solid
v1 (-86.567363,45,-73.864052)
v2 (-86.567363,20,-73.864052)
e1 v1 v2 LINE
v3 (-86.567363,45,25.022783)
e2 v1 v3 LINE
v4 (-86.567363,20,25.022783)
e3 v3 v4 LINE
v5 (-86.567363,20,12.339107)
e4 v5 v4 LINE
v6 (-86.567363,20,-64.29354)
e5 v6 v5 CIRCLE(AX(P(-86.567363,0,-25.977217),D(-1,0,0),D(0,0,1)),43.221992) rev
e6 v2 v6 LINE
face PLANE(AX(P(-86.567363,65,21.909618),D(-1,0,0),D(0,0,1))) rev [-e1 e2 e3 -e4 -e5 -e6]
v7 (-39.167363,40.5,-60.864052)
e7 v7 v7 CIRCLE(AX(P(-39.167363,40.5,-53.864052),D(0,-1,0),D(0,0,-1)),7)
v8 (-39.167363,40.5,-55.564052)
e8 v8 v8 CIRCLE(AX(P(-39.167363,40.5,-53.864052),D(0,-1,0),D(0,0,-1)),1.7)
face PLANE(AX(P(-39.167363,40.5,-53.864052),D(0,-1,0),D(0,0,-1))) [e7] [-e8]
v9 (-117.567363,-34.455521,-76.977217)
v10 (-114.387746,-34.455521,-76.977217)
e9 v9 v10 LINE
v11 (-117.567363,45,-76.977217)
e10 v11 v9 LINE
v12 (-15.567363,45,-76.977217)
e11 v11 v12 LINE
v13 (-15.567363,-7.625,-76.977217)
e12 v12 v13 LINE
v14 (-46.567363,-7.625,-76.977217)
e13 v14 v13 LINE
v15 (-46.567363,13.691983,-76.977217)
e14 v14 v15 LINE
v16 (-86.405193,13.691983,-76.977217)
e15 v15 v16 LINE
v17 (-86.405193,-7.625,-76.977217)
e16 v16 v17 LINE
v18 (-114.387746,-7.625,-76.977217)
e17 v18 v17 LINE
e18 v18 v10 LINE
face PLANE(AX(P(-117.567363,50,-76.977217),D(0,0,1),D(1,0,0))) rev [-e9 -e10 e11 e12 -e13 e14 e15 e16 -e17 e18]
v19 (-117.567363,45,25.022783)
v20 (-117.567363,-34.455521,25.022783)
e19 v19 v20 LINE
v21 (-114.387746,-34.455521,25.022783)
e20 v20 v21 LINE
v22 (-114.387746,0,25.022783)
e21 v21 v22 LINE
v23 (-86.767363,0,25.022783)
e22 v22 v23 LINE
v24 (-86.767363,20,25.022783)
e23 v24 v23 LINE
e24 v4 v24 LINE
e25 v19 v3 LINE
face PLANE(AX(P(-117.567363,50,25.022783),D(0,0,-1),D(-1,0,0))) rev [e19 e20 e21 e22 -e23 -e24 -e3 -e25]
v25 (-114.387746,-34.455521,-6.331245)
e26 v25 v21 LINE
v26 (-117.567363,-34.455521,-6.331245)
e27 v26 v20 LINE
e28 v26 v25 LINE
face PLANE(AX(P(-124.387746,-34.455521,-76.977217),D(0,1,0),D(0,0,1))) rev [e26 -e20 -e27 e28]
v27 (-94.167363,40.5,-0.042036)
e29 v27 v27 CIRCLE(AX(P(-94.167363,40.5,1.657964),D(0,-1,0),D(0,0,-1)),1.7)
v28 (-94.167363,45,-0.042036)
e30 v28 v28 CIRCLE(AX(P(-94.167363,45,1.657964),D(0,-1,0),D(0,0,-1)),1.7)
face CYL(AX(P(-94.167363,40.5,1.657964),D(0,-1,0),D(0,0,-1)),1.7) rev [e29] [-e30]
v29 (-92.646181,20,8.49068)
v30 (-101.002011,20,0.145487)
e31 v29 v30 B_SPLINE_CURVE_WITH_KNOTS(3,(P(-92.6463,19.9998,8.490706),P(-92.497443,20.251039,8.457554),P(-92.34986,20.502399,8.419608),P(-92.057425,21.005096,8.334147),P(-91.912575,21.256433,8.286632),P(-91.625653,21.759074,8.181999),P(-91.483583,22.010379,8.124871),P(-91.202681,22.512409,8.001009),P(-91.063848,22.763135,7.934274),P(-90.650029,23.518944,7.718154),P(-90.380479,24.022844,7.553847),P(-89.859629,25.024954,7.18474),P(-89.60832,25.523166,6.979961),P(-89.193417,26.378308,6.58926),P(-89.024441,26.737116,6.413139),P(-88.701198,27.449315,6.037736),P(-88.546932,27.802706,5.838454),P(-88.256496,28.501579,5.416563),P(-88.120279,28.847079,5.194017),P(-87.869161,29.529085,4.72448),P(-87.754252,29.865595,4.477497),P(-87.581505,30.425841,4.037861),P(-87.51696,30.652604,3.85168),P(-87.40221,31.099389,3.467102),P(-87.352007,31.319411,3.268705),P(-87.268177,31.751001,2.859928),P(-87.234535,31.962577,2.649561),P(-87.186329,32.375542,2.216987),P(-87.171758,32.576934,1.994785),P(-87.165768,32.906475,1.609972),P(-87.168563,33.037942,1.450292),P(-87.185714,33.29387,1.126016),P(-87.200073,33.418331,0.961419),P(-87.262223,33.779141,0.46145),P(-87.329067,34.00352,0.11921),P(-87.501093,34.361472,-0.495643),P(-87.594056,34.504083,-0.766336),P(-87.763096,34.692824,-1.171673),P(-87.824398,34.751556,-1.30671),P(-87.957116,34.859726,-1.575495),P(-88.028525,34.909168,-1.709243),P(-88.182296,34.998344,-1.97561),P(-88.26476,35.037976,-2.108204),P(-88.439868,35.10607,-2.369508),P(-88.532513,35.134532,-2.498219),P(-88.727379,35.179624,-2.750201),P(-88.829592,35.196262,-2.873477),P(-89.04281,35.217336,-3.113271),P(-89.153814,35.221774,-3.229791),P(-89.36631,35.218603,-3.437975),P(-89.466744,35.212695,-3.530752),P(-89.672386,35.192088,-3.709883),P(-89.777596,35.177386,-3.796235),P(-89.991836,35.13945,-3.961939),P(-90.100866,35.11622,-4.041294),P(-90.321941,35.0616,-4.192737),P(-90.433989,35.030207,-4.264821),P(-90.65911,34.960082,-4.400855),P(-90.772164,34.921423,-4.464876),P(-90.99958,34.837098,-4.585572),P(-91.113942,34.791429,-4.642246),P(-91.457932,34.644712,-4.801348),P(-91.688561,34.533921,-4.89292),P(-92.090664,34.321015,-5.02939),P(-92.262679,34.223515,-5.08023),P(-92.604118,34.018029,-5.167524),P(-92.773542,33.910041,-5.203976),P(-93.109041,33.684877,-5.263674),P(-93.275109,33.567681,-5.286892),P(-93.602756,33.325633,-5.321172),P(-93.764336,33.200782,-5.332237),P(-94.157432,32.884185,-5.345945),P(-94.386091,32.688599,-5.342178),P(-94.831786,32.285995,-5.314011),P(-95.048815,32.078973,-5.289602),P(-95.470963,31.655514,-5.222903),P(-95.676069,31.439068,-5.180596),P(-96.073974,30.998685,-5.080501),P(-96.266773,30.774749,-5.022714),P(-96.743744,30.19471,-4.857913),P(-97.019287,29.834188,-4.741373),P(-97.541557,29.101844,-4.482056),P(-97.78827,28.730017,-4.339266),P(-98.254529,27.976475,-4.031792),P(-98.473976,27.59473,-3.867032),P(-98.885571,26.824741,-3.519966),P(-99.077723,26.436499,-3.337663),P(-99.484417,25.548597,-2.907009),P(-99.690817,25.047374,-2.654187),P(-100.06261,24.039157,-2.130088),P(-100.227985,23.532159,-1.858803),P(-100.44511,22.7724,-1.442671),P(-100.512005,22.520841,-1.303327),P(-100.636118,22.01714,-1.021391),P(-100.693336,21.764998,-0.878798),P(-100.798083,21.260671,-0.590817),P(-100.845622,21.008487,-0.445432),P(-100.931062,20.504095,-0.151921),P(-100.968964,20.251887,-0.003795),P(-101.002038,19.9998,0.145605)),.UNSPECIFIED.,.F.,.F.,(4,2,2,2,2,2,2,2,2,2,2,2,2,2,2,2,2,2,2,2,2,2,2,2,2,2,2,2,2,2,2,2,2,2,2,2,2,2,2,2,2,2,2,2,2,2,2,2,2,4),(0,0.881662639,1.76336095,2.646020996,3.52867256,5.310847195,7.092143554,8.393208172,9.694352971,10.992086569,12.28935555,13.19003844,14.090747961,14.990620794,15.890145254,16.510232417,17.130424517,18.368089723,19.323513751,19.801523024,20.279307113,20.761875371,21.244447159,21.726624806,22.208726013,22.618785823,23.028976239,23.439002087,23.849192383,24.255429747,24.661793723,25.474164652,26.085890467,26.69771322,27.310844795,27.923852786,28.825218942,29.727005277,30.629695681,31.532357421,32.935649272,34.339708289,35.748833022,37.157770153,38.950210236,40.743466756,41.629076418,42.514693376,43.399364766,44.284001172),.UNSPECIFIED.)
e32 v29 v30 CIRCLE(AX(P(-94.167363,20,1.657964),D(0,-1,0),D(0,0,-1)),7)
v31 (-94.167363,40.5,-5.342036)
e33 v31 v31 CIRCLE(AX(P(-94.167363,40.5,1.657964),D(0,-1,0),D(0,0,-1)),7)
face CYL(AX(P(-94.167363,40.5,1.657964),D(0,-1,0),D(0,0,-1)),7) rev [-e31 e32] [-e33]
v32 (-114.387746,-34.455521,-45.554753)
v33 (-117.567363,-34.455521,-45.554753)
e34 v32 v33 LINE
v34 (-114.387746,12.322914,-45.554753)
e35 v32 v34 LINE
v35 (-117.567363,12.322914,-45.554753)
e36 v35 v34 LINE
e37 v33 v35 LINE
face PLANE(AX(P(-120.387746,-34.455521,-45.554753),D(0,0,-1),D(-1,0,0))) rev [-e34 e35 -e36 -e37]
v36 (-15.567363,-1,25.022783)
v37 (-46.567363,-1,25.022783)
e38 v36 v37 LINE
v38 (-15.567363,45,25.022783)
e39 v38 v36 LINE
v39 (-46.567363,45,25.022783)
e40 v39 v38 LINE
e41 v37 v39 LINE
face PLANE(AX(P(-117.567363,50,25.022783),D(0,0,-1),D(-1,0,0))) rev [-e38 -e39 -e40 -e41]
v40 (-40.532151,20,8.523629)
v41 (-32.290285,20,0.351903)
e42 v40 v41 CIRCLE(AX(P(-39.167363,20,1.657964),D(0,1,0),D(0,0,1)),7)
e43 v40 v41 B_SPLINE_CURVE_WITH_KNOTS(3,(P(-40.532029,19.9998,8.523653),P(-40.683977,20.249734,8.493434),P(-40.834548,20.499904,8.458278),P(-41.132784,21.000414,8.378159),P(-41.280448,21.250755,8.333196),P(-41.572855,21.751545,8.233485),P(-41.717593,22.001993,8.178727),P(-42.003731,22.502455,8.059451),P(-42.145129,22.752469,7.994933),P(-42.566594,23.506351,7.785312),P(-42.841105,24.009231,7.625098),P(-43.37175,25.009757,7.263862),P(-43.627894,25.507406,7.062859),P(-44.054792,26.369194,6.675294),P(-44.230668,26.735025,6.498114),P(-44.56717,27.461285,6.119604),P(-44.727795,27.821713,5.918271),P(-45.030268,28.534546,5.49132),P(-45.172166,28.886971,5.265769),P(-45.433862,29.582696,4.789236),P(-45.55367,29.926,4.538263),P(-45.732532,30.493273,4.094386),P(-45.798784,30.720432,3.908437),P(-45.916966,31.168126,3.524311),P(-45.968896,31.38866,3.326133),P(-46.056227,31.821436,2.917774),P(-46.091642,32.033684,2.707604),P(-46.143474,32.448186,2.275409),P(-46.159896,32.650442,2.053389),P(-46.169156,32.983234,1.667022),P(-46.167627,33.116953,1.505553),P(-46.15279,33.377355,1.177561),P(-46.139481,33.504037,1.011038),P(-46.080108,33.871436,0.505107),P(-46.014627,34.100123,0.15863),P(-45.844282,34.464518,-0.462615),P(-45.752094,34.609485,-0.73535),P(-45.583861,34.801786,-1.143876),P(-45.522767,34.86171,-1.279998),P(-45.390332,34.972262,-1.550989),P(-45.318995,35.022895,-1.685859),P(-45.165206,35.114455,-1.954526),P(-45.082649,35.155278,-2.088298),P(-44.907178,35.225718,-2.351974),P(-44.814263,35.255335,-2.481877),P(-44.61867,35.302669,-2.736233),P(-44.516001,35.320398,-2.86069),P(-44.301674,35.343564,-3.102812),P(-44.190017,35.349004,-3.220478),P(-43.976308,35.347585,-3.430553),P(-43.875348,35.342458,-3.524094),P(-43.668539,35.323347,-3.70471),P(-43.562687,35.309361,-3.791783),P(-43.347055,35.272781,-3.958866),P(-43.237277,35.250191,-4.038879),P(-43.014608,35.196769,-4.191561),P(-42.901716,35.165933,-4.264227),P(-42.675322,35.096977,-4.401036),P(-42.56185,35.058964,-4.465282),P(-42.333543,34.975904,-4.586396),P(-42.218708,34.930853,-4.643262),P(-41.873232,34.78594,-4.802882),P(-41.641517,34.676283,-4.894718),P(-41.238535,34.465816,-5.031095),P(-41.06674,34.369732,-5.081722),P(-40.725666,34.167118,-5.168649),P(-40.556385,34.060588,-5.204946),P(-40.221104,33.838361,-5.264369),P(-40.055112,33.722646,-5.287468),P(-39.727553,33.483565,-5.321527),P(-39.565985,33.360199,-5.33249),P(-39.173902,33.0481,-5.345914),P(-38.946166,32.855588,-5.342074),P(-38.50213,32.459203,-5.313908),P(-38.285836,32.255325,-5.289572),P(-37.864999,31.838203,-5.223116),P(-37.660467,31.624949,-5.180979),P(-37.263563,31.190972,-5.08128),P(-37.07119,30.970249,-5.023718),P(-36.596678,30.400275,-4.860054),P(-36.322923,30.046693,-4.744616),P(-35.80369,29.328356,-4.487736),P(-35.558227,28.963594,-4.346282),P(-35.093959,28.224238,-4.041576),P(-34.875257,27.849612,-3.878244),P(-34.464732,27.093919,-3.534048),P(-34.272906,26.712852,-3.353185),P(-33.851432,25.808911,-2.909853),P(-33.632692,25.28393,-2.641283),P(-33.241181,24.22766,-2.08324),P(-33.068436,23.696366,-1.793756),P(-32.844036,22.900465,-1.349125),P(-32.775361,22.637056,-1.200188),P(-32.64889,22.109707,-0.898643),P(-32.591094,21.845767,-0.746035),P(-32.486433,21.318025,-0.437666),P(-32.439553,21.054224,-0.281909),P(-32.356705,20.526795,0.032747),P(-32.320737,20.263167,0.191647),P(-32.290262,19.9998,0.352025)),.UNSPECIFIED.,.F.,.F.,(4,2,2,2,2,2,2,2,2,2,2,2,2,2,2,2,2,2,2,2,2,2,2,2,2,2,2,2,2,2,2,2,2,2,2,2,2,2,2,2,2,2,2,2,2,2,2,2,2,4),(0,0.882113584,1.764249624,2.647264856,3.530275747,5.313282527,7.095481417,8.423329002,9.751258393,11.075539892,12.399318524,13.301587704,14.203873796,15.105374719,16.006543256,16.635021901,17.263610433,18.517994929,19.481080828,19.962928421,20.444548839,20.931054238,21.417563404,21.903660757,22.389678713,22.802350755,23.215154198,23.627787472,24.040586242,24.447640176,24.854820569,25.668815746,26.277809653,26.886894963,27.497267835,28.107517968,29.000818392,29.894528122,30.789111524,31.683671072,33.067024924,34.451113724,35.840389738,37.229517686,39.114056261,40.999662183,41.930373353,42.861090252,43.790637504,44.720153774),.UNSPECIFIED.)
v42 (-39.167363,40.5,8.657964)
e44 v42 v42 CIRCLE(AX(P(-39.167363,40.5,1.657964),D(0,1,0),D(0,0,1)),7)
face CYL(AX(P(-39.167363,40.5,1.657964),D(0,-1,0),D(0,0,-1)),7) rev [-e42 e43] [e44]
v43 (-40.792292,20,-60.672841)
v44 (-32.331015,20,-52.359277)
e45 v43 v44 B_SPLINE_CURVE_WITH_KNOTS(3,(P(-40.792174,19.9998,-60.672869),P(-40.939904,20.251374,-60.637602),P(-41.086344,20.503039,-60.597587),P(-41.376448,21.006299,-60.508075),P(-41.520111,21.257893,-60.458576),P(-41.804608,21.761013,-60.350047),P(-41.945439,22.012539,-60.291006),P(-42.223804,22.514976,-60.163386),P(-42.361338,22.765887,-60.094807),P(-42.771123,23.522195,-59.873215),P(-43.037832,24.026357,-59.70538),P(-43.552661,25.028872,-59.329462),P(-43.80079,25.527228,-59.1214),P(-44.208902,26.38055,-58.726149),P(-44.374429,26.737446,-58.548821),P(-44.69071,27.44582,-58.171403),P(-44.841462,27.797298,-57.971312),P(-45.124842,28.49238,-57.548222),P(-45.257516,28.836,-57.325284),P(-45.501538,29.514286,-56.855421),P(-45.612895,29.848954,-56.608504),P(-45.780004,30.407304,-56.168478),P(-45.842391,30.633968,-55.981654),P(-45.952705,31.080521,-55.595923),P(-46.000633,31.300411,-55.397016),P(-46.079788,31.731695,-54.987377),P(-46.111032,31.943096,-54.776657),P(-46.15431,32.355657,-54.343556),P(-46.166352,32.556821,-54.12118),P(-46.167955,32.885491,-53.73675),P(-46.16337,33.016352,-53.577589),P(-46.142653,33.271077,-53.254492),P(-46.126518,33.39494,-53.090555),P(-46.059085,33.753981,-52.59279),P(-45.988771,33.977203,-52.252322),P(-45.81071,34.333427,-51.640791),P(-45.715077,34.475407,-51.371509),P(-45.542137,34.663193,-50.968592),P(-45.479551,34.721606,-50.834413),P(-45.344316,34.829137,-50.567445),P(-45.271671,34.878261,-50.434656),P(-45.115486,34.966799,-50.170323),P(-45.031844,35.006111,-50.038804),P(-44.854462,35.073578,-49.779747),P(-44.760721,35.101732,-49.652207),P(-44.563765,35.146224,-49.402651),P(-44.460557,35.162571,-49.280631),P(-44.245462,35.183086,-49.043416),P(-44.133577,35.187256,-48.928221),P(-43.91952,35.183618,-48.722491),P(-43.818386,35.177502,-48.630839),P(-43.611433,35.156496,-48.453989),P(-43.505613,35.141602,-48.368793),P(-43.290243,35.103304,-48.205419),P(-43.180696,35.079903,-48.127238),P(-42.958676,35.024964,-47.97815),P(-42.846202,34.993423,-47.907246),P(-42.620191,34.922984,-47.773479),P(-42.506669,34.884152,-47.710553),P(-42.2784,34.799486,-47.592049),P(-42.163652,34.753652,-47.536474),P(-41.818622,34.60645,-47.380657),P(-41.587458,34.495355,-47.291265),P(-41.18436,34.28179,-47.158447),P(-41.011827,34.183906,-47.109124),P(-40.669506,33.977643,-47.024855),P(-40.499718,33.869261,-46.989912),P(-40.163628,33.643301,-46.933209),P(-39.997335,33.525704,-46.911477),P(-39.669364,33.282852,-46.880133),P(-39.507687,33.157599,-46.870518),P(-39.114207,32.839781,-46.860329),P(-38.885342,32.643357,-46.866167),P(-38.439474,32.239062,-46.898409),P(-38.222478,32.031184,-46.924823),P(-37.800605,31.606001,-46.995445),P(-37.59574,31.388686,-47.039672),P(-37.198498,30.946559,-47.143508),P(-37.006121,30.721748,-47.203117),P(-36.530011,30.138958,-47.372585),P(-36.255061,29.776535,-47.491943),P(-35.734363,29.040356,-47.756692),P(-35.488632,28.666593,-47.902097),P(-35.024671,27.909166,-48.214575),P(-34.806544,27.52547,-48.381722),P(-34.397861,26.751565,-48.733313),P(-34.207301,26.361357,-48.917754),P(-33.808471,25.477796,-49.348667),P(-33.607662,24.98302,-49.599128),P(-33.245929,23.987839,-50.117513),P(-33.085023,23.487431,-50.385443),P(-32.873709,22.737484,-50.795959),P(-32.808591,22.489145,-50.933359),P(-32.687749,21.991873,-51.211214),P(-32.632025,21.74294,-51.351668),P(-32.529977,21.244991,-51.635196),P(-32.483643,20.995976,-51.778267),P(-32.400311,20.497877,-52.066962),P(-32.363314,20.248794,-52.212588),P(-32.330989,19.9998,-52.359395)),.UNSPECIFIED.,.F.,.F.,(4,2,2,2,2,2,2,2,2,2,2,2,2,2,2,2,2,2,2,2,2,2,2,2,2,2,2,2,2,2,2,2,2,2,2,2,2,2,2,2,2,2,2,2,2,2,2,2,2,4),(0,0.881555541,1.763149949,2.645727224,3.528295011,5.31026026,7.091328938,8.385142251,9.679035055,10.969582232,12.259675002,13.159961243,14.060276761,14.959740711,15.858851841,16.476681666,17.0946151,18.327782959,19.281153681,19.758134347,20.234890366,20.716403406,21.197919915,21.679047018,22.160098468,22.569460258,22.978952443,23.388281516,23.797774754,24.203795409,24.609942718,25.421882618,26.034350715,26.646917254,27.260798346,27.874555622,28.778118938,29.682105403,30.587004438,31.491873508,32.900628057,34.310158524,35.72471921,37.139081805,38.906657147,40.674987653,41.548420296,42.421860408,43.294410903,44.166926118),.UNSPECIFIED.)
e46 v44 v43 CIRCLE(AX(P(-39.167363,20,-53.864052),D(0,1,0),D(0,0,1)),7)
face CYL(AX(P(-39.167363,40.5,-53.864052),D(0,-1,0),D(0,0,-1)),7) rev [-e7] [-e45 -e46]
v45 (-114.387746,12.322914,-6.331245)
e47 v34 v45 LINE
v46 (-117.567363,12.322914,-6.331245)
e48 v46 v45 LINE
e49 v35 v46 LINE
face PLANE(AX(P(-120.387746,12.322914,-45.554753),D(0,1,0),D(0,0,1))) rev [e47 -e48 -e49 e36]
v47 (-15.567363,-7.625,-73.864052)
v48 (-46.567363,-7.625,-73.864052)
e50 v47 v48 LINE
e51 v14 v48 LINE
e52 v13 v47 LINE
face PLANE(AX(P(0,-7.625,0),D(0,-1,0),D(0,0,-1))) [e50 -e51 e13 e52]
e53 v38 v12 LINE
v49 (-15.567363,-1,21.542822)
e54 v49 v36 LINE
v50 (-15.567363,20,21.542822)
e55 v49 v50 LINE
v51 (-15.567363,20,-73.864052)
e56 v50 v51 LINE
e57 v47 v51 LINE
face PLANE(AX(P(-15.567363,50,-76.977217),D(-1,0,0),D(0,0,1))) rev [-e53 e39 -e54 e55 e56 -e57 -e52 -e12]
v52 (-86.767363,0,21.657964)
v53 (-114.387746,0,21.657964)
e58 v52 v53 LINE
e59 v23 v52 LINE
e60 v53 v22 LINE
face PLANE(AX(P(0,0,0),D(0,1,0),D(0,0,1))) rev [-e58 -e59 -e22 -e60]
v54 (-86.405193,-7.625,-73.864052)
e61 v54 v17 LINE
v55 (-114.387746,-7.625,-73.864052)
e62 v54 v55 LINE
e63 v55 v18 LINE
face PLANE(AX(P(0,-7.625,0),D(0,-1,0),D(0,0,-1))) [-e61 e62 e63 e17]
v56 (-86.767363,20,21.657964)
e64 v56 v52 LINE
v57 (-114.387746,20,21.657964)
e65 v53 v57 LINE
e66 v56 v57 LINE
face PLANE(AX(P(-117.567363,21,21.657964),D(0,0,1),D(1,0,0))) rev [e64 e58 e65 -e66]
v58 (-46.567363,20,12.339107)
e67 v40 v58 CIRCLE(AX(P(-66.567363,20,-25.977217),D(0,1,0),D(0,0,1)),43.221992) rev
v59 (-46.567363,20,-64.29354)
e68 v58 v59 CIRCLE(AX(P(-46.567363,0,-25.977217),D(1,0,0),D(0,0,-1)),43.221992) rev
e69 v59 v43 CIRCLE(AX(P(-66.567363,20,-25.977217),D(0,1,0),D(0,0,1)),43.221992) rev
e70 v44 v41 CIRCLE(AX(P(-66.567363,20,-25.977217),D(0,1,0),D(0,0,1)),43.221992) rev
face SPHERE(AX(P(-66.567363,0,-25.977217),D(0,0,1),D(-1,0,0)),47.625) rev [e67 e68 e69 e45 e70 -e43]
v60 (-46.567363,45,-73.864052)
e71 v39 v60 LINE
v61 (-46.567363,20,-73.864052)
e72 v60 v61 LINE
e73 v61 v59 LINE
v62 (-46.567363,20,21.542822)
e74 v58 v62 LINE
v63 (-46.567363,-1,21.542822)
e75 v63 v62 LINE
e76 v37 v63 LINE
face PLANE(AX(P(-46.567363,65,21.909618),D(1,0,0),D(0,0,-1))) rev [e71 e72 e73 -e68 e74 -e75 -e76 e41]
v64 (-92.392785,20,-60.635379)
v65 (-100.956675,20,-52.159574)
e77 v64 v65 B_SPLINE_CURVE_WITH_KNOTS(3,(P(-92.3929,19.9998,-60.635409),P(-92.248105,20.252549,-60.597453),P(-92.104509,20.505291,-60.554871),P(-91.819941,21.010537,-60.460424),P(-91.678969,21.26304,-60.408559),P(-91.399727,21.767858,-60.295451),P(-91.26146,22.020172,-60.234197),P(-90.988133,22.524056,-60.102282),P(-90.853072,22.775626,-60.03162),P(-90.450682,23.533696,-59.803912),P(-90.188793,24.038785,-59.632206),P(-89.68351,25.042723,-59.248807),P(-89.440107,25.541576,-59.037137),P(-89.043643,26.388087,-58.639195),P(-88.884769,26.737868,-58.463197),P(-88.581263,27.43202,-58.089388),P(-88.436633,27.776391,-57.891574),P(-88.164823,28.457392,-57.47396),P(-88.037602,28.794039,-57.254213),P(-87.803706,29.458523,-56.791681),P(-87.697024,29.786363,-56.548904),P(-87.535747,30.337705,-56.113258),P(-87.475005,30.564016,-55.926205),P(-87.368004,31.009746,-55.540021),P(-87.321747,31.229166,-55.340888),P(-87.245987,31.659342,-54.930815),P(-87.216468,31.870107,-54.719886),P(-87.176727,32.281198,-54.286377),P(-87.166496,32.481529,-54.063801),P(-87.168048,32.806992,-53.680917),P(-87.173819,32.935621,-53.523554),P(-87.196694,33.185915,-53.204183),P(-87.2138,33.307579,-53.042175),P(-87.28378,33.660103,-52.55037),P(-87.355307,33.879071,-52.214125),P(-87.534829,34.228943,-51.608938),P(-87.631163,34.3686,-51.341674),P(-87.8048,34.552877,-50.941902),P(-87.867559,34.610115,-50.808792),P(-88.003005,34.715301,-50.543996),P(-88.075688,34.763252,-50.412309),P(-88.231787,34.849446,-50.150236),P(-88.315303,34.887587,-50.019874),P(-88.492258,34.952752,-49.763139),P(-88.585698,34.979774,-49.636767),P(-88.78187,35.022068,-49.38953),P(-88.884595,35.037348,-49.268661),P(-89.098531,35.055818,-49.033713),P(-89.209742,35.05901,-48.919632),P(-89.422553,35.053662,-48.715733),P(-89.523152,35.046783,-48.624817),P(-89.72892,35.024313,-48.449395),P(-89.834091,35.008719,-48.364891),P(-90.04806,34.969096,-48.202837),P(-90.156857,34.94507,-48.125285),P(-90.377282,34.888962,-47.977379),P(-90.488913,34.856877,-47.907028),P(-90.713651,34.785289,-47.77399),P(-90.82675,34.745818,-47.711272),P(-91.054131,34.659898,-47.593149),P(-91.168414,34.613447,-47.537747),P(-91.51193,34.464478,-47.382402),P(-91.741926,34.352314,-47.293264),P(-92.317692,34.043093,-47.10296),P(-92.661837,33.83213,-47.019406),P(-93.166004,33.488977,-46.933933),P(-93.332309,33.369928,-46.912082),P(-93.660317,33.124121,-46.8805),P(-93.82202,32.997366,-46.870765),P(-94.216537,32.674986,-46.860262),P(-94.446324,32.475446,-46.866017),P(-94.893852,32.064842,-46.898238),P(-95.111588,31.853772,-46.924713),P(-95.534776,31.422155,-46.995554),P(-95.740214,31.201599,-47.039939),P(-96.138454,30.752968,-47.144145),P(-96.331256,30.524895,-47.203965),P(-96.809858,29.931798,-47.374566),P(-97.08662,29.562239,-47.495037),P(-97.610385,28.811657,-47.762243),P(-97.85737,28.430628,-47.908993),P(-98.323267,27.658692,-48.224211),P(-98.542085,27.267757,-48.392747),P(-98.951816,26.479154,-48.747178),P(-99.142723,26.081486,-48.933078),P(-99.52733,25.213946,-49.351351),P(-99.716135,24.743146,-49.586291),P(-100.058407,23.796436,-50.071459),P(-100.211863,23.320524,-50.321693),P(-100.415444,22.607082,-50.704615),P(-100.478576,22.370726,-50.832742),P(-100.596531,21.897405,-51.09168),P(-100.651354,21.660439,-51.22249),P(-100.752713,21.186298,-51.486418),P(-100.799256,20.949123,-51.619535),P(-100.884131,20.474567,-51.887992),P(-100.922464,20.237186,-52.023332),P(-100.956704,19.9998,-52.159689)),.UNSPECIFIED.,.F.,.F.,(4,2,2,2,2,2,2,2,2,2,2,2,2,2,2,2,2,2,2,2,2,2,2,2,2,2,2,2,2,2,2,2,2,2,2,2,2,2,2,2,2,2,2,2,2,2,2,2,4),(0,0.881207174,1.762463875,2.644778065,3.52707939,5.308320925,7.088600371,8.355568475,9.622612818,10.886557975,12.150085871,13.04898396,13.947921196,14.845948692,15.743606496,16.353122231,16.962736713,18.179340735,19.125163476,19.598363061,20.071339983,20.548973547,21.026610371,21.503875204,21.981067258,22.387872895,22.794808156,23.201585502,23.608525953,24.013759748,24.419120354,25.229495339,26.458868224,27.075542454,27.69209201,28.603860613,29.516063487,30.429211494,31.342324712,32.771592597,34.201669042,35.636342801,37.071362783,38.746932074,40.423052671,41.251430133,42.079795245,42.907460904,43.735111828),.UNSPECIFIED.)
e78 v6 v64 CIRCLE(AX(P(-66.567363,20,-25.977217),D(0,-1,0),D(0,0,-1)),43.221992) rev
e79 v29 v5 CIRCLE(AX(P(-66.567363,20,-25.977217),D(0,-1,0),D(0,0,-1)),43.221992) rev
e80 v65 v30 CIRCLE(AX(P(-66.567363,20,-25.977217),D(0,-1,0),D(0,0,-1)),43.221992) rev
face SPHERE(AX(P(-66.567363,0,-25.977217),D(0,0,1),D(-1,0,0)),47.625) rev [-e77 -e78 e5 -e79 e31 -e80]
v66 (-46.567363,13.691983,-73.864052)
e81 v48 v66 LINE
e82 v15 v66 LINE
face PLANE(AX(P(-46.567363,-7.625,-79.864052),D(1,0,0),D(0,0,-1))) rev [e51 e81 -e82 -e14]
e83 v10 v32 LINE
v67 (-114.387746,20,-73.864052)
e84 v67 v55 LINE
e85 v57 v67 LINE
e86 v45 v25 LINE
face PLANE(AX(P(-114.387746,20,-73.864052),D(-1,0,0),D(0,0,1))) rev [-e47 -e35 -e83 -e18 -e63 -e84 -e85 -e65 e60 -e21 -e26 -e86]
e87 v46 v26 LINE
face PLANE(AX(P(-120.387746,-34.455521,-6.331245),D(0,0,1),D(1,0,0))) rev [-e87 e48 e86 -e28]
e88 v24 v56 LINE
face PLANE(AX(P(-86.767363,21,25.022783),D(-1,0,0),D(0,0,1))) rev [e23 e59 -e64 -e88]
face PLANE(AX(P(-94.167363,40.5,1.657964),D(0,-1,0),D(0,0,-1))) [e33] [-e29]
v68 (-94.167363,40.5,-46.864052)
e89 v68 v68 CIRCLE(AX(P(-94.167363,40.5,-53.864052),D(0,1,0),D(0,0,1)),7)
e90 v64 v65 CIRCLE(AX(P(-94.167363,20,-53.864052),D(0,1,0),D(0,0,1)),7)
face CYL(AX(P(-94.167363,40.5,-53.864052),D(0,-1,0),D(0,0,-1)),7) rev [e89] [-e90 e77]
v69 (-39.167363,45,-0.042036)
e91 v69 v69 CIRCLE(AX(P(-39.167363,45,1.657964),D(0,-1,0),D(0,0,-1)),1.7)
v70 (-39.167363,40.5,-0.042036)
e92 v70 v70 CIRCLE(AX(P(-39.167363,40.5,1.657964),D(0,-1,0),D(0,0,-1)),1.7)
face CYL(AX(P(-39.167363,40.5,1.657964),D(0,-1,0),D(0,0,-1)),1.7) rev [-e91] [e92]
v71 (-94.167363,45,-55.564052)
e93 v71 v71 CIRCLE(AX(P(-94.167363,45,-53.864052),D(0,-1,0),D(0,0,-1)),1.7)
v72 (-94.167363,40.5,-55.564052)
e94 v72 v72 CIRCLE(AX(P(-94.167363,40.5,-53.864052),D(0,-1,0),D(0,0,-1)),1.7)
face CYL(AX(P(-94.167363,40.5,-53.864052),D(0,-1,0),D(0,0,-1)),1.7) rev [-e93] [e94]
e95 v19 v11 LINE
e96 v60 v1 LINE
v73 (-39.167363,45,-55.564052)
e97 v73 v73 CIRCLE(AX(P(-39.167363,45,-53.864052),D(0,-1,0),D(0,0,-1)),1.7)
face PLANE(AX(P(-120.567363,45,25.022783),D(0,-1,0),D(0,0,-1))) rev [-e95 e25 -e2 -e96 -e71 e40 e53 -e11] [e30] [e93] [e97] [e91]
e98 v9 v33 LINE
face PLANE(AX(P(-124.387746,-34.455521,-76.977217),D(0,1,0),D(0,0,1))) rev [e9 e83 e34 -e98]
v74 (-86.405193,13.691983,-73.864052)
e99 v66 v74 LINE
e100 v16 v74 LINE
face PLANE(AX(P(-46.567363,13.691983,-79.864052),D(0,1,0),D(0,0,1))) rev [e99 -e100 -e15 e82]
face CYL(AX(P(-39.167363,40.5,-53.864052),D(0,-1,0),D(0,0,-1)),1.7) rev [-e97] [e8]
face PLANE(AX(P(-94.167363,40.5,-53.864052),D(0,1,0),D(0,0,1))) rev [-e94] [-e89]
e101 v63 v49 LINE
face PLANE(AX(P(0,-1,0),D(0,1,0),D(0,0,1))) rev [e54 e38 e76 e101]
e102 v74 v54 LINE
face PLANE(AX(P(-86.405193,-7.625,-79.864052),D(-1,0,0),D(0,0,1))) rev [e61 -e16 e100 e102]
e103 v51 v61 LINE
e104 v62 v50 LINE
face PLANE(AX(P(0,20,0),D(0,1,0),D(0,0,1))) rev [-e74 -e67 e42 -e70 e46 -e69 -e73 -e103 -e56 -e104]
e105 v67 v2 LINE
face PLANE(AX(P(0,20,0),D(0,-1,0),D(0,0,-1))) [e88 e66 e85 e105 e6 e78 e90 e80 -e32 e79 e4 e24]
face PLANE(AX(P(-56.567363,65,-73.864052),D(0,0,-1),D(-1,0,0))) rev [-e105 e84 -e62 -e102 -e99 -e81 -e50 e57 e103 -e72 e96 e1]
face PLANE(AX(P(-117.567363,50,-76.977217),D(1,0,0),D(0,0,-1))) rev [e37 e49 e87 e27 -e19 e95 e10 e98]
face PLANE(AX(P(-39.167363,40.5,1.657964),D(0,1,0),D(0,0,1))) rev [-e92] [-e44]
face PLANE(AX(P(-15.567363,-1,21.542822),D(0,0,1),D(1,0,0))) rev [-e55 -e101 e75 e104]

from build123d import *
from build123d.topology import SkipClean

# Parameters (mm, degrees)
SKETCH1_W                   = 102
SKETCH1_H                   = 102
BOSS_EXTRUDE1_DEPTH         = 50
CUT_EXTRUDE_THIN1_OUTLINE_W = 40
CUT_EXTRUDE_THIN1_OUTLINE_H = 95.773670058
CUT_EXTRUDE_THIN1_DEPTH     = 50
SKETCH4_W                   = 40
SKETCH4_H                   = 6.202657501
CUT_EXTRUDE3_DEPTH          = 54
SKETCH5_W                   = 33.817621941
SKETCH5_H                   = 102.594578927
CUT_EXTRUDE4_DEPTH          = 20
SKETCH6_W                   = 27.820383201
SKETCH6_H                   = 98.886835029
CUT_EXTRUDE5_DEPTH          = 20
SKETCH7_W                   = 30.8
SKETCH7_H                   = 3.364819678
BOSS_EXTRUDE2_DEPTH         = 21
SKETCH9_W                   = 31
SKETCH9_H                   = 3.479961613
BOSS_EXTRUDE4_DEPTH         = 21
SKETCH11_W                  = 98.820383201
SKETCH11_H                  = 3.113164971
BOSS_EXTRUDE6_DEPTH         = 47.625
SKETCH14_W                  = 102
SKETCH14_H                  = 5
CUT_EXTRUDE7_DEPTH          = 105
SKETCH17_R                  = 7
CUT_EXTRUDE12_DEPTH         = 20.5
M3_CLEARANCE_HOLE1_D        = 3.4
SKETCH22_W                  = 3.179616799
SKETCH22_H                  = 102
BOSS_EXTRUDE7_DEPTH         = 47.6
SKETCH23_W                  = 98.820383201
SKETCH23_H                  = 3.113164971
CUT_EXTRUDE13_DEPTH         = 40
SKETCH24_W                  = 102
SKETCH24_H                  = 13.144479163
CUT_EXTRUDE14_DEPTH         = 10
SKETCH25_W                  = 39.837829701
SKETCH25_H                  = 21.316982849
CUT_EXTRUDE15_DEPTH         = 6
SKETCH26_W                  = 39.22350869
SKETCH26_H                  = 46.778434415
CUT_EXTRUDE16_DEPTH         = 6


# Read off the part's stored shape, not the designer's step: Cut-Extrude-Thin1
with BuildPart() as part:
    # Sketch1 → Boss-Extrude1 (new body)
    with BuildSketch(Plane(origin=(0, 0, 0), x_dir=(1, 0, 0), z_dir=(0, 1, 0))):
        with Locations((-66.567363259, 25.977216604)):
            Rectangle(SKETCH1_W, SKETCH1_H)
    extrude(amount=BOSS_EXTRUDE1_DEPTH)

    # Sketch2 → Cut-Revolve1 (revolve, cut)
    with SkipClean():  # the faces are left unmerged after this step: merging them gives an invalid solid
        with BuildSketch(Plane(origin=(0, 0, 0), x_dir=(1, 0, 0), z_dir=(0, 1, 0))):
            with BuildLine():
                ThreePointArc((-66.567363259, 73.602216604), (-114.192363259, 25.977216604), (-66.567363259, -21.647783396))
                Line((-66.567363259, -21.647783396), (-66.567363259, 73.602216604))
            make_face()
            with BuildLine():
                Line((-66.567363259, 73.602216604), (-66.567363259, -21.647783396))
                ThreePointArc((-66.567363259, -21.647783396), (-32.891402805, -7.69874385), (-18.942363259, 25.977216604))
                ThreePointArc((-18.942363259, 25.977216604), (-32.891402805, 59.653177058), (-66.567363259, 73.602216604))
            make_face()
        revolve(axis=Axis((-66.567363259, 0, 21.647783396), (0, 0, -1)), mode=Mode.SUBTRACT)
    add(part.part.scale(1), mode=Mode.REPLACE)  # the faces are merged on a copy

    # Cut-Extrude-Thin1 outline → Cut-Extrude-Thin1 (cut)
    with BuildSketch(Plane(origin=(0, 0, 0), x_dir=(1, 0, 0), z_dir=(0, 1, 0))):
        with Locations((-66.567363259, 25.977216604)):
            Rectangle(CUT_EXTRUDE_THIN1_OUTLINE_W, CUT_EXTRUDE_THIN1_OUTLINE_H)
    extrude(amount=CUT_EXTRUDE_THIN1_DEPTH, mode=Mode.SUBTRACT)

    # Sketch4 → Cut-Extrude3 (cut)
    with BuildSketch(Plane(origin=(0, 0, 0), x_dir=(1, 0, 0), z_dir=(0, 1, 0))):
        with Locations((-66.567363259, -25.010947176)):
            Rectangle(SKETCH4_W, SKETCH4_H)
    extrude(amount=CUT_EXTRUDE3_DEPTH, mode=Mode.SUBTRACT)

    # Sketch5 → Cut-Extrude4 (cut)
    with BuildSketch(Plane(origin=(0, 0, 0), x_dir=(1, 0, 0), z_dir=(0, 1, 0))):
        with Locations((-29.658552289, 22.56676217)):
            Rectangle(SKETCH5_W, SKETCH5_H)
    extrude(amount=CUT_EXTRUDE4_DEPTH, mode=Mode.SUBTRACT)

    # Sketch6 → Cut-Extrude5 (cut)
    with BuildSketch(Plane(origin=(0, 0, 0), x_dir=(-1, 0, 0), z_dir=(0, -1, 0))):
        with Locations((100.47755486, 24.420634119)):
            Rectangle(SKETCH6_W, SKETCH6_H)
    extrude(amount=-CUT_EXTRUDE5_DEPTH, mode=Mode.SUBTRACT)

    # Sketch7 → Boss-Extrude2 (add)
    with BuildSketch(Plane(origin=(0, 0, 0), x_dir=(1, 0, 0), z_dir=(0, 1, 0))):
        with Locations((-102.167363259, -23.340373557)):
            Rectangle(SKETCH7_W, SKETCH7_H)
    extrude(amount=BOSS_EXTRUDE2_DEPTH)

    # Sketch9 → Boss-Extrude4 (add)
    with BuildSketch(Plane.XZ.offset(-20)):
        with Locations((-31.067363259, 23.28280259)):
            Rectangle(SKETCH9_W, SKETCH9_H)
    extrude(amount=BOSS_EXTRUDE4_DEPTH)

    # Sketch11 → Boss-Extrude6 (add)
    with BuildSketch(Plane.XZ):
        with Locations((-64.97755486, -75.420634119)):
            Rectangle(SKETCH11_W, SKETCH11_H)
    extrude(amount=BOSS_EXTRUDE6_DEPTH)

    # Sketch14 → Cut-Extrude7 (cut)
    with BuildSketch(Plane(origin=(-15.567363259, 0, 0), x_dir=(0, 0, -1), z_dir=(1, 0, 0))):
        with Locations((25.977216604, 47.5)):
            Rectangle(SKETCH14_W, SKETCH14_H)
    extrude(amount=-CUT_EXTRUDE7_DEPTH, mode=Mode.SUBTRACT)

    # Sketch17 → Cut-Extrude12 (cut)
    with BuildSketch(Plane.XZ.offset(-20)):
        with Locations(Location((-94.167363259, 1.657963718, 0), (0, 0, 270))):
            Circle(SKETCH17_R)
        with Locations(Location((-94.167363259, -53.864051633, 0), (0, 0, 284.685382437))):
            Circle(SKETCH17_R)
        with Locations(Location((-39.167363259, 1.657963718, 0), (0, 0, 349.246729183))):
            Circle(SKETCH17_R)
        with Locations(Location((-39.167363259, -53.864051633, 0), (0, 0, 270))):
            Circle(SKETCH17_R)
    extrude(amount=-CUT_EXTRUDE12_DEPTH, mode=Mode.SUBTRACT)

    # M3 Clearance Hole1 (through all)
    with Locations(Plane(origin=(0, 40.5, 0), x_dir=(-1, 0, 0), z_dir=(0, -1, 0))):
        with Locations((94.167363259, -1.657963718), (39.167363259, -1.657963718), (39.167363259, 53.864051633), (94.167363259, 53.864051633)):
            Hole(M3_CLEARANCE_HOLE1_D / 2)

    # Sketch22 → Boss-Extrude7 (add)
    with BuildSketch(Plane.XZ):
        with Locations((-115.97755486, -25.977216604)):
            Rectangle(SKETCH22_W, SKETCH22_H)
    extrude(amount=BOSS_EXTRUDE7_DEPTH)

    # Sketch23 → Cut-Extrude13 (cut)
    with BuildSketch(Plane.XZ.offset(47.625)):
        with Locations((-64.97755486, -75.420634119)):
            Rectangle(SKETCH23_W, SKETCH23_H)
    extrude(amount=-CUT_EXTRUDE13_DEPTH, mode=Mode.SUBTRACT)

    # Sketch24 → Cut-Extrude14 (cut)
    with BuildSketch(Plane(origin=(-114.38774646, 0, 0), x_dir=(0, 0, -1), z_dir=(1, 0, 0))):
        with Locations((25.977216604, -41.027760419)):
            Rectangle(SKETCH24_W, SKETCH24_H)
    extrude(amount=-CUT_EXTRUDE14_DEPTH, mode=Mode.SUBTRACT)

    # Sketch25 → Cut-Extrude15 (cut)
    with BuildSketch(Plane.XY.offset(-73.864051633)):
        with Locations((-66.48627811, 3.033491424)):
            Rectangle(SKETCH25_W, SKETCH25_H)
    extrude(amount=-CUT_EXTRUDE15_DEPTH, mode=Mode.SUBTRACT)

    # Sketch26 → Cut-Extrude16 (cut)
    with BuildSketch(Plane(origin=(-114.38774646, 0, 0), x_dir=(0, 0, -1), z_dir=(1, 0, 0))):
        with Locations((25.942998987, -11.06630363)):
            Rectangle(SKETCH26_W, SKETCH26_H)
    extrude(amount=-CUT_EXTRUDE16_DEPTH, mode=Mode.SUBTRACT)


solid = part.part
